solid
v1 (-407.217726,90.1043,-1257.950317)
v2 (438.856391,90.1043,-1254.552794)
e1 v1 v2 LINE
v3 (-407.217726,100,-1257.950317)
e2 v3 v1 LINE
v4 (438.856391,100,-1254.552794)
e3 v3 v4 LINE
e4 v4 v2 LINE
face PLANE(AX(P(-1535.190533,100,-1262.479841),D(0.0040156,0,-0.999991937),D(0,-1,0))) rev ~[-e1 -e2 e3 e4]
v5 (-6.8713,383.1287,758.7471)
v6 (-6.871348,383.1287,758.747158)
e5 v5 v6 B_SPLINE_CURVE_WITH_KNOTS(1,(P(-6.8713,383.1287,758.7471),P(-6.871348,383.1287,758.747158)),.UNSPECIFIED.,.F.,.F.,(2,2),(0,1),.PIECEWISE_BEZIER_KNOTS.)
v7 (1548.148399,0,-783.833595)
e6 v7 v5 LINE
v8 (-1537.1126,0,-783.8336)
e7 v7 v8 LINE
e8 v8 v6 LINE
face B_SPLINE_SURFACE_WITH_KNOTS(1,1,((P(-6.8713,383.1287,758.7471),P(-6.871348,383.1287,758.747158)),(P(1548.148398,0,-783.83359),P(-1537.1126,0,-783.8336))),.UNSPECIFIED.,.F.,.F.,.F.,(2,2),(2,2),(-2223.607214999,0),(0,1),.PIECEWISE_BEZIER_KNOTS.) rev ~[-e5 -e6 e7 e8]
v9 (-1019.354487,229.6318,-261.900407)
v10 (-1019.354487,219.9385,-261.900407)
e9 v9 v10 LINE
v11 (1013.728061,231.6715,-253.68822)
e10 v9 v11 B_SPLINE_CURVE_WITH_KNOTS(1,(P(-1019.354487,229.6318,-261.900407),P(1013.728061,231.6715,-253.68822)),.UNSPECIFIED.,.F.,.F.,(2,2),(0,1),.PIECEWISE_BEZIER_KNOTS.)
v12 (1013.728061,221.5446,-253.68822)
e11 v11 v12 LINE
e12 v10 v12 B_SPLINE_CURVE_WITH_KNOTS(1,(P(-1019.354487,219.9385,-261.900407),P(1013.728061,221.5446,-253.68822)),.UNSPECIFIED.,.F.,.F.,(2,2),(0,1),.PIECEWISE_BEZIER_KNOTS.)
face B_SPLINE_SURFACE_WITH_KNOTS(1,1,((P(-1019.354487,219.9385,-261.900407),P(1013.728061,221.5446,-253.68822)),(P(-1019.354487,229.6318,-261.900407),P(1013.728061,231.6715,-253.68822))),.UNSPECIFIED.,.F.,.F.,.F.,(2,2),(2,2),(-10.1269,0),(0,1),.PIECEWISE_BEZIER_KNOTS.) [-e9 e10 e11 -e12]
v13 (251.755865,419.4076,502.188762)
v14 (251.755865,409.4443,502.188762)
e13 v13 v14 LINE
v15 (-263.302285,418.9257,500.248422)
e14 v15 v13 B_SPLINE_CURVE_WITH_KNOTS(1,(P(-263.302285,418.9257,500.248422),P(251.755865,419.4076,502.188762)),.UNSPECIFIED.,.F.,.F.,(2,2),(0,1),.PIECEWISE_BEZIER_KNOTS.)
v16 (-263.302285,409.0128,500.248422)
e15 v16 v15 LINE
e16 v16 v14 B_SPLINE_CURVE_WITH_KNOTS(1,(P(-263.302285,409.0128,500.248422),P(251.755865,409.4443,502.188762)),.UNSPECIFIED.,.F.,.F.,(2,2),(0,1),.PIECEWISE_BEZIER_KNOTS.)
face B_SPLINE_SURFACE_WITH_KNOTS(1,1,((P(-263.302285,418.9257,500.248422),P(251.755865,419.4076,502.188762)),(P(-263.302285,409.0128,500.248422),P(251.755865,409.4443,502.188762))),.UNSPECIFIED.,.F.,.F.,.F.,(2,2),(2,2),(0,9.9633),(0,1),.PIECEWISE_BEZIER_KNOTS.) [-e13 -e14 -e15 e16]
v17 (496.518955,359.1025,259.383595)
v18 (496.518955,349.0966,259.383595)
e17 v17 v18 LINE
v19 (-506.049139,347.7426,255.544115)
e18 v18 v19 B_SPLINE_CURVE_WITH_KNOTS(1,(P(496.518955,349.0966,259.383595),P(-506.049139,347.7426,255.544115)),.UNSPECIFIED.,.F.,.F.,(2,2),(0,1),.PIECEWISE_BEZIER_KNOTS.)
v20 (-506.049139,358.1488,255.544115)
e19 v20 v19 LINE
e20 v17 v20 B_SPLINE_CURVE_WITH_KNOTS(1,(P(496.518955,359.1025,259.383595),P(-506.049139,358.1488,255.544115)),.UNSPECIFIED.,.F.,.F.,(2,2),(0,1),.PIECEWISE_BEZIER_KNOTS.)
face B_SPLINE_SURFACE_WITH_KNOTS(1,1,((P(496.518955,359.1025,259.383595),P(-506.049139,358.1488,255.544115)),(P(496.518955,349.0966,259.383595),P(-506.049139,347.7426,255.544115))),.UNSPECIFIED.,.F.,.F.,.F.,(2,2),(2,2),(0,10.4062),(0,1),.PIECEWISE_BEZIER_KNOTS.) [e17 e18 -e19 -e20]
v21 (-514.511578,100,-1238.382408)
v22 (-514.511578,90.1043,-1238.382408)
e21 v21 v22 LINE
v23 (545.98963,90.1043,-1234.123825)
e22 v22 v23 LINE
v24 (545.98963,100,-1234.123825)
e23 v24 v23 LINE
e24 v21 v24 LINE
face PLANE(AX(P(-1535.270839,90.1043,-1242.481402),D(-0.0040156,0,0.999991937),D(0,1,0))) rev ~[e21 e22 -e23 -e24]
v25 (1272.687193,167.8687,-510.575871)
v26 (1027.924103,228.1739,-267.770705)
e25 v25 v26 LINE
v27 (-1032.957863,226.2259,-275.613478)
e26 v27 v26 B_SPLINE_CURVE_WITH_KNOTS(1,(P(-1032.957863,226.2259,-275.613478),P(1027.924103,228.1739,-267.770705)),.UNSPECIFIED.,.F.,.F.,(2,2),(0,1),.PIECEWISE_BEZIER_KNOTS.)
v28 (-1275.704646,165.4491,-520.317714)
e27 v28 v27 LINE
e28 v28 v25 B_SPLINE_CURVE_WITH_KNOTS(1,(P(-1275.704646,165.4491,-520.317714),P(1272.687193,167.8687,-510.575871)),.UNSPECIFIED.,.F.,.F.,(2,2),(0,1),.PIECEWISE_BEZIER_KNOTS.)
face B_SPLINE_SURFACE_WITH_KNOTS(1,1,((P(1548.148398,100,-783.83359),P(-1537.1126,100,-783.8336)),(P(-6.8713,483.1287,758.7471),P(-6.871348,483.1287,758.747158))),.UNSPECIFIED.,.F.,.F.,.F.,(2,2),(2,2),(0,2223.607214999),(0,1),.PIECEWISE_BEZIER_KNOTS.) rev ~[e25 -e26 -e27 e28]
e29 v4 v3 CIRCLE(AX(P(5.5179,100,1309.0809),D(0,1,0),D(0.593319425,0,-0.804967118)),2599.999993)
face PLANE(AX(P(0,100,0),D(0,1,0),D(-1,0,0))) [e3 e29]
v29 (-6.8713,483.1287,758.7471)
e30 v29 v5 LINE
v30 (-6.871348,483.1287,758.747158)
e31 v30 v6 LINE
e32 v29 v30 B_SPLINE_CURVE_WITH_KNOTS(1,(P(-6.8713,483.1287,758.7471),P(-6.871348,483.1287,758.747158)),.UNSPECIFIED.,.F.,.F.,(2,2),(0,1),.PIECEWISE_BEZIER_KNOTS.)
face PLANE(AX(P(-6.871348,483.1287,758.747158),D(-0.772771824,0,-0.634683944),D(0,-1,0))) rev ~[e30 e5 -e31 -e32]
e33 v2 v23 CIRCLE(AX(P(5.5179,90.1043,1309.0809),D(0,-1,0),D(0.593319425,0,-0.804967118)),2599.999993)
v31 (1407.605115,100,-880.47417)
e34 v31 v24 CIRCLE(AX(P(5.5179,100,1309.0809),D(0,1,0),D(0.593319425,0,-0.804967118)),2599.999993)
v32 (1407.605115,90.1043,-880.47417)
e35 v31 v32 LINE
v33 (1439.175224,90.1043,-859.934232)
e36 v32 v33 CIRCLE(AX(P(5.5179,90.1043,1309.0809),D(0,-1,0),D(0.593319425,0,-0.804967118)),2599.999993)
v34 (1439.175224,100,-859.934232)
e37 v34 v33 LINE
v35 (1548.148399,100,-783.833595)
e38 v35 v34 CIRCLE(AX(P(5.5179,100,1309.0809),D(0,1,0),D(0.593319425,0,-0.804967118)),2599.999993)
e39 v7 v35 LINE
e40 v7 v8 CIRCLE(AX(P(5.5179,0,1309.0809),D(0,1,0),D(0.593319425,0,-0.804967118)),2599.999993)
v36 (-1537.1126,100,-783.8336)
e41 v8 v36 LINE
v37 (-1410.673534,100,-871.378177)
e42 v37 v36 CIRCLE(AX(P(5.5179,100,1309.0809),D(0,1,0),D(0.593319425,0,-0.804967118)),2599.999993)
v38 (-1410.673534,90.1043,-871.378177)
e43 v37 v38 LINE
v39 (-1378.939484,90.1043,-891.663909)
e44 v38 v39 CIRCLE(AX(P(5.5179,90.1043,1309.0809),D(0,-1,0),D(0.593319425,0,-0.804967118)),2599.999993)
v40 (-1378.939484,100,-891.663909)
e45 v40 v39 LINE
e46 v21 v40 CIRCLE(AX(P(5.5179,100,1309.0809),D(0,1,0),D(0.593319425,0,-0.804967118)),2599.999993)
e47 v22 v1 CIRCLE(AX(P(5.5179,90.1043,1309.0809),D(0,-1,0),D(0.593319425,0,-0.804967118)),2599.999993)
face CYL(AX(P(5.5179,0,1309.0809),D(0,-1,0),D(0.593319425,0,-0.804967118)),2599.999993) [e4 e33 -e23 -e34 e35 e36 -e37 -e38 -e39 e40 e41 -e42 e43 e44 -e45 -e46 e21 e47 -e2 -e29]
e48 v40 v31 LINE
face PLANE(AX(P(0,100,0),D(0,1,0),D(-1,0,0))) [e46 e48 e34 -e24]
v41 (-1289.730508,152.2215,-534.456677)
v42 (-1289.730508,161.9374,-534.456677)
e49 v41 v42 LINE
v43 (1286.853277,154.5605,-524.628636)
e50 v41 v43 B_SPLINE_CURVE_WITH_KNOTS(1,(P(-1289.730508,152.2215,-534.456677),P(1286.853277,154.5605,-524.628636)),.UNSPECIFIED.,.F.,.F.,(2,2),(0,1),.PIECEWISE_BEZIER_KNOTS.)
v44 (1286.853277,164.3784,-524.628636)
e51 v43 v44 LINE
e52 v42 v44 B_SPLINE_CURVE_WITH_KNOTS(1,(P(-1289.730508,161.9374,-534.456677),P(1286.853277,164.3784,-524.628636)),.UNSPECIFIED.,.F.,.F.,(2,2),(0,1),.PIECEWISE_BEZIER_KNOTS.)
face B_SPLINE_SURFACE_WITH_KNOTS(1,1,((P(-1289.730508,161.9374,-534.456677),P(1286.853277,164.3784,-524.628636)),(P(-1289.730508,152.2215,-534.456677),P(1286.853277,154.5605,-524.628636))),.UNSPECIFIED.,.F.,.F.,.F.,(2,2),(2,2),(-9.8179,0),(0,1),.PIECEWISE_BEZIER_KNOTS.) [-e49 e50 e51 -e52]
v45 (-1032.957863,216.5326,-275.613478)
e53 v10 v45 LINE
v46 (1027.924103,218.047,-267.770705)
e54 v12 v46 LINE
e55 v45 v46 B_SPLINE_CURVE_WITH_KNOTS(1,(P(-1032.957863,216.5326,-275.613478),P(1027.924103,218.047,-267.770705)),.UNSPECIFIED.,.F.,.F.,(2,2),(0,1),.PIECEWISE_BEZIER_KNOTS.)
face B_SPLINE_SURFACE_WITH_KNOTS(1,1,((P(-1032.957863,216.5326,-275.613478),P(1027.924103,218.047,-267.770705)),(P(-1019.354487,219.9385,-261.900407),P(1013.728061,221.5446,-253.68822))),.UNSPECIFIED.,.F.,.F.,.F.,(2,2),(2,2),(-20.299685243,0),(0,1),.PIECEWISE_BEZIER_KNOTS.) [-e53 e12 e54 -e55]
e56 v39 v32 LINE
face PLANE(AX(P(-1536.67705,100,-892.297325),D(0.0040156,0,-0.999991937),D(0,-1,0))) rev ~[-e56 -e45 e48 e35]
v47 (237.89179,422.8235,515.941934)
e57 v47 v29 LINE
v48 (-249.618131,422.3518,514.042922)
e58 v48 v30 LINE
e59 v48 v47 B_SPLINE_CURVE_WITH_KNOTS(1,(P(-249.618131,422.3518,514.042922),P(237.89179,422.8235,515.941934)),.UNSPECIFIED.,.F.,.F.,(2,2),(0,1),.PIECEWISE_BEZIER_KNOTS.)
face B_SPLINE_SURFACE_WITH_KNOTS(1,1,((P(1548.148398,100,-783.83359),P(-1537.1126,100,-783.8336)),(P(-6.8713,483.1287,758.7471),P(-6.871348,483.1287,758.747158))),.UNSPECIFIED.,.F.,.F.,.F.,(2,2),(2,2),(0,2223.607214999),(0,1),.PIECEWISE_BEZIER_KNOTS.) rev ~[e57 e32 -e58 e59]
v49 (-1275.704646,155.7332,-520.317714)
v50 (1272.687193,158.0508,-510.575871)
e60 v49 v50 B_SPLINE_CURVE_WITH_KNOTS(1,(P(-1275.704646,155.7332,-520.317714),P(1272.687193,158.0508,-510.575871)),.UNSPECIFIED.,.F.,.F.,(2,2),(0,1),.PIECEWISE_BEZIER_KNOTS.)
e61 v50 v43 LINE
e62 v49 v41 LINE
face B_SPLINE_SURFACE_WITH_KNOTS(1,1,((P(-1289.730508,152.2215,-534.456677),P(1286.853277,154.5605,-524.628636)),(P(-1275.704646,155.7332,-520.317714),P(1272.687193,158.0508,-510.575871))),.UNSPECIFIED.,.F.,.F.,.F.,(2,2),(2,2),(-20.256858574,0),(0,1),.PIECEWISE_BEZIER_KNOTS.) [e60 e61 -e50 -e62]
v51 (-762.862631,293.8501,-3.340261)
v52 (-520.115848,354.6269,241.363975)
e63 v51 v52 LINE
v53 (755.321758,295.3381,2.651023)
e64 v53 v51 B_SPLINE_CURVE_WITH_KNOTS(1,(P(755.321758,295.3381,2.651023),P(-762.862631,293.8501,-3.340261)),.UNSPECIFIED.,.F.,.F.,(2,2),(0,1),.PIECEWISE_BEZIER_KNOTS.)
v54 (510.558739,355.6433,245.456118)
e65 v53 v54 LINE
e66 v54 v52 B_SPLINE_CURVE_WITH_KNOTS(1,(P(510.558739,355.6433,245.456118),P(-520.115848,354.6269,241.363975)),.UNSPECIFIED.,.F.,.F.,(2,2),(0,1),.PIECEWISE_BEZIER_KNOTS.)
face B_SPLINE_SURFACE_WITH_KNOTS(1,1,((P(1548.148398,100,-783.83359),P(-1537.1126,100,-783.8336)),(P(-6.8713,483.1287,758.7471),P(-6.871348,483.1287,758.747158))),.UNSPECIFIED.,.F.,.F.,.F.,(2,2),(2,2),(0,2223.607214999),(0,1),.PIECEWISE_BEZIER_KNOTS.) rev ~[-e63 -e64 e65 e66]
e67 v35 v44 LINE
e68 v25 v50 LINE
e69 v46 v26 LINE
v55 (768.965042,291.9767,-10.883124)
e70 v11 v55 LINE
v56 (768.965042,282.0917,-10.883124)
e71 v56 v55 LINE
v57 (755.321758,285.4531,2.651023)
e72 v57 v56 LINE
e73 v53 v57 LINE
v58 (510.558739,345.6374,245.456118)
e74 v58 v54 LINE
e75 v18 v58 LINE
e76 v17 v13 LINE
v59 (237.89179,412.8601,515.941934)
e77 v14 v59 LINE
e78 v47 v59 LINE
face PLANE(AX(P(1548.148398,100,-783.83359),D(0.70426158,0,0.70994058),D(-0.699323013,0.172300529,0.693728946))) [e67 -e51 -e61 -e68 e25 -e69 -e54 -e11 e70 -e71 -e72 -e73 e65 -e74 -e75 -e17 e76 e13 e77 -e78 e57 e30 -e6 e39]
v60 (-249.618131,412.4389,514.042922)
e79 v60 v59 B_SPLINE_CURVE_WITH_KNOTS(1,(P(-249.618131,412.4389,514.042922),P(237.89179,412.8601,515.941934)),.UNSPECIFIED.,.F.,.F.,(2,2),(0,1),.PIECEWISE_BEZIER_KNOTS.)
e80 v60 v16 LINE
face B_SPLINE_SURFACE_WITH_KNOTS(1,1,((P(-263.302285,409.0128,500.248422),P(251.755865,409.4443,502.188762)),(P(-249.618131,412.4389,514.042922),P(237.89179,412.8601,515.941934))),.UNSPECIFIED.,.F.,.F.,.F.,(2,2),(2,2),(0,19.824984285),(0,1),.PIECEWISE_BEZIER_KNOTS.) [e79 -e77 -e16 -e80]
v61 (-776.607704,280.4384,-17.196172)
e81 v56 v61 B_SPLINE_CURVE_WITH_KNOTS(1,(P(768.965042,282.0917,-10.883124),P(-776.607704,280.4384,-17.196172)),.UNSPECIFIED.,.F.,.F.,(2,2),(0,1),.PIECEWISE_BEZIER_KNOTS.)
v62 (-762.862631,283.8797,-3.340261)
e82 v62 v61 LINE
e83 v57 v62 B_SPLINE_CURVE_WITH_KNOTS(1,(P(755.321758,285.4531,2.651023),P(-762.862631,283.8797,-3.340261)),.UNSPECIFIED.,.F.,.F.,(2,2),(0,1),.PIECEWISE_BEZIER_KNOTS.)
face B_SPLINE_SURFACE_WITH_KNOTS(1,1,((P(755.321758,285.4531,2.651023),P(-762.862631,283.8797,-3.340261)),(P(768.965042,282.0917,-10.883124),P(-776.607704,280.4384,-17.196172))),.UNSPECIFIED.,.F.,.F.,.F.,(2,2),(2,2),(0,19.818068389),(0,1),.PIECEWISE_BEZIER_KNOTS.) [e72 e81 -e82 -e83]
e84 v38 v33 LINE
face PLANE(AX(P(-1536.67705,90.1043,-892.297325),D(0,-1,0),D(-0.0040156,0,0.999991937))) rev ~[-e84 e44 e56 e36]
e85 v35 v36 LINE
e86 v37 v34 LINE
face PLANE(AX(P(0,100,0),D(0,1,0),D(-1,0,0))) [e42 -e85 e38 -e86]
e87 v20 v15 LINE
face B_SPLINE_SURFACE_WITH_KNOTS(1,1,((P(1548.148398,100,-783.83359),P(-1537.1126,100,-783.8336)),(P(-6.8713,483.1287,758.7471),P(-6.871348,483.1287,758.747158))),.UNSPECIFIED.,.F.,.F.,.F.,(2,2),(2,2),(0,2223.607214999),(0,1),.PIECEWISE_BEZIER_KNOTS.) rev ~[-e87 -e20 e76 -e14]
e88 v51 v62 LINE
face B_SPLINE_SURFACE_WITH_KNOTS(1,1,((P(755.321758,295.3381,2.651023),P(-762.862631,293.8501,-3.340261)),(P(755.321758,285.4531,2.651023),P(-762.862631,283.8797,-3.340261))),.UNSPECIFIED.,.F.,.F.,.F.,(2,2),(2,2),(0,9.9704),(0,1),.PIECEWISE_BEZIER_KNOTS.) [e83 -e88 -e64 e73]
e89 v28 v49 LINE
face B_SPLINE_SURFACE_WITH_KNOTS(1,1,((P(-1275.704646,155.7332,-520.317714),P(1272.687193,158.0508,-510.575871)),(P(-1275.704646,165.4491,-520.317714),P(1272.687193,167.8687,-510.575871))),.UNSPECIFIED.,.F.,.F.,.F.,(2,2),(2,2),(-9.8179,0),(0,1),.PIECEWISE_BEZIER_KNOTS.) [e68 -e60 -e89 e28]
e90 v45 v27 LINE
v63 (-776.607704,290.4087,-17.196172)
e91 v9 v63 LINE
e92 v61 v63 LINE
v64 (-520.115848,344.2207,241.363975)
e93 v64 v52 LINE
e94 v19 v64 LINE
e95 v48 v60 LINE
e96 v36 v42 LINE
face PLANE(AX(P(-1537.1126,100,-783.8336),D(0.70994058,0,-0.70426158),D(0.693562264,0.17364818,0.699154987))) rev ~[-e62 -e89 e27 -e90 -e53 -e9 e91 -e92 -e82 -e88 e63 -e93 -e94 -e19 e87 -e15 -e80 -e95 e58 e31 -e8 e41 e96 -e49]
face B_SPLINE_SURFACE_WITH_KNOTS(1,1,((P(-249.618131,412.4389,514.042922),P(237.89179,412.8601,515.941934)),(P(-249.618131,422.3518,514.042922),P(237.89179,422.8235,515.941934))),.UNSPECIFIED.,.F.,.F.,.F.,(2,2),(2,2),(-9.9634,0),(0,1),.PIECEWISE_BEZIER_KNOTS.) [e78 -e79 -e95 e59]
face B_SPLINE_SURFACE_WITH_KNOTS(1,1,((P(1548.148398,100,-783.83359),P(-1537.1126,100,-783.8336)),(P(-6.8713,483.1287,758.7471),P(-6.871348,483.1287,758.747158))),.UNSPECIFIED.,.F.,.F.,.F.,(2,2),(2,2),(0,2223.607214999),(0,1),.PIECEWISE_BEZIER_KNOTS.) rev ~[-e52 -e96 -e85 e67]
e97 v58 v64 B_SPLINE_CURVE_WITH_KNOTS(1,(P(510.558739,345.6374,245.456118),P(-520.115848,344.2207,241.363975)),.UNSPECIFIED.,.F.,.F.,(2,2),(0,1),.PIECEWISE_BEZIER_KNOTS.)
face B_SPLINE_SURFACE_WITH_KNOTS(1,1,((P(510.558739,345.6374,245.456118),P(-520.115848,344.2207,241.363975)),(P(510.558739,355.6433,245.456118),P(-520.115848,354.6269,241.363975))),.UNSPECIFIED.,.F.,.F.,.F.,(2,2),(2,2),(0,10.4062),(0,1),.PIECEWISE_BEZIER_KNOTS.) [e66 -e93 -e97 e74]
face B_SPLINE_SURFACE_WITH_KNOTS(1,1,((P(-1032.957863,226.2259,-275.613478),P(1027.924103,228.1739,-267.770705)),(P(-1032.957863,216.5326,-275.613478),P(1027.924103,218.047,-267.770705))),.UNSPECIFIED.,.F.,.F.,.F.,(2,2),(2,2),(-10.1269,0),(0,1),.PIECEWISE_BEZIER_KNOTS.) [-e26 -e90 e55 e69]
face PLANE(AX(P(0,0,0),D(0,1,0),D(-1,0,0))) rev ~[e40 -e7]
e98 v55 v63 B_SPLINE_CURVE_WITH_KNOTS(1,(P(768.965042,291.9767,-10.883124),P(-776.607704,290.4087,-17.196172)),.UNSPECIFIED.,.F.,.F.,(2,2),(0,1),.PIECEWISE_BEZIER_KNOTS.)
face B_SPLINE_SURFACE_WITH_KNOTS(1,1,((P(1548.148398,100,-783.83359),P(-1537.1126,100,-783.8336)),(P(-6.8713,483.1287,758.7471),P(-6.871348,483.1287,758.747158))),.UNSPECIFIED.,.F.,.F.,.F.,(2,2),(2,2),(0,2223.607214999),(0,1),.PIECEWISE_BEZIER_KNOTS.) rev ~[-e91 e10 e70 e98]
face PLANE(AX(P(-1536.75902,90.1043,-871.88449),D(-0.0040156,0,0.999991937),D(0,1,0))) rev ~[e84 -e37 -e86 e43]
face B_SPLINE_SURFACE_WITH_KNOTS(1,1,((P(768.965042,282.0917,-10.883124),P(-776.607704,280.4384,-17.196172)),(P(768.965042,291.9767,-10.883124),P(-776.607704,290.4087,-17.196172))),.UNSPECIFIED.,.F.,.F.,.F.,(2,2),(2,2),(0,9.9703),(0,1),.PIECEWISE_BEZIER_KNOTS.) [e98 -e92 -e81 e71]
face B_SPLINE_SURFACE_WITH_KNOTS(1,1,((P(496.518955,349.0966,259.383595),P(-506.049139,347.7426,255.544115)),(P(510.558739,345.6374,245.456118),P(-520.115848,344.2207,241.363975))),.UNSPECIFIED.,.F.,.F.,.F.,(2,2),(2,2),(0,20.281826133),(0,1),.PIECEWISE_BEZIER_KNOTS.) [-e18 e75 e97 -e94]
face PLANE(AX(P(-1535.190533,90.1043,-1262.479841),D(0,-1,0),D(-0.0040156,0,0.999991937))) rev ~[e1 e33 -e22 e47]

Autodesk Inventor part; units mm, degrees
sketch "Sketch1" plane through (0, 0, 0) normal (0, 1, 0) x (-1, 0, 0)
  arc A0 (-1548.1484, -783.8336) -> (1537.1126, -783.8336) centre (-5.5179, 1309.0809) ccw
  line L0 (6.8713, 758.7471) -> (-1548.1484, -783.8336)
  line L1 (1537.1126, -783.8336) -> (6.8713, 758.7471)
  line L2 (-1548.1484, -783.8336) -> (1537.1126, -783.8336)
  point P0 (0, 0)
  point P1 (-841.7636, 217.1232)
ref_plane "Work Plane1" through (-6.8713, 0, 758.7471) normal (0.7042616, 0, 0.7099406) x (0.7099406, 0, -0.7042616)
ref_plane "Work Plane2" through (-1537.1126, 0, -783.8336) normal (-0.7099406, 0, 0.7042616) x (0.7042616, 0, 0.7099406)
ref_plane "Work Plane3" through (-6.8713, 0, 758.7471) normal (0, -1, 0) x (0.7099406, 0, -0.7042616)
extrude "Extrusion1" add sketch "Sketch1" along normal blind 100 contours L2 A0
sketch "Sketch2" plane through (-1537.1126, 0, -783.8336) normal (-0.7099406, 0, 0.7042616) x (0.7042616, 0, 0.7099406)
  line L0 (0, 0) -> (0, 100) projected
  line L1 (0, 100) -> (0, 0)
  line L2 (0, 0) -> (2172.8308, 383.1287)
  line L3 (0, 0) -> (2206.3502, 0) construction
  line L4 (0, 100) -> (2172.8308, 483.1287)
  line L5 (0, 100) -> (2206.3502, 100) construction
  line L6 (2172.8308, 483.1287) -> (2172.8308, 383.1287)
  point P0 (1639.0046, 0)
  dimension "d4" = 10
  dimension "d5" = 10
sketch "Sketch4" plane through (-6.8713, 0, 758.7471) normal (0.7042616, 0, 0.7099406) x (0.7099406, 0, -0.7042616)
  line L0 (0, 483.1287) -> (0, 383.1287) projected
  line L1 (0, 483.1287) -> (0, 383.1287)
  line L2 (2190.3519, 0) -> (0, 0) projected
  line L3 (2190.3519, 0) -> (0, 383.1287)
  line L4 (2190.3519, 0) -> (2190.3519, 100) projected
  line L5 (2190.3519, 0) -> (2190.3519, 100)
  line L6 (2190.3519, 100) -> (0, 483.1287)
  point P0 (539.2347, 0)
loft "Loft1" add profiles "Sketch4", "Sketch2"
sketch "Sketch5" plane through (-6.8713, 0, 758.7471) normal (0.7042616, 0, 0.7099406) x (0.7099406, 0, -0.7042616)
  line L0 (344.7656, 422.8235) -> (344.7656, 412.8601)
  line L1 (344.7656, 422.8235) -> (364.2941, 419.4076)
  line L2 (364.2941, 419.4076) -> (364.2941, 409.4443)
  line L3 (364.2941, 409.4443) -> (344.7656, 412.8601)
  point P0 (539.2347, 0)
sketch "Sketch6" plane through (-1537.1126, 0, -783.8336) normal (-0.7099406, 0, 0.7042616) x (0.7042616, 0, 0.7099406)
  line L0 (1828.1481, 422.3518) -> (1828.1481, 412.4389)
  line L1 (1828.1481, 412.4389) -> (1808.7176, 409.0128)
  line L2 (1808.7176, 409.0128) -> (1808.7176, 418.9257)
  line L3 (1808.7176, 418.9257) -> (1828.1481, 422.3518)
  point P0 (1639.0046, 0)
loft "Loft2" cut profiles "Sketch6", "Sketch5"
sketch "Sketch8" plane through (-1537.1126, 0, -783.8336) normal (-0.7099406, 0, 0.7042616) x (0.7042616, 0, 0.7099406)
  line L0 (1464.0348, 358.1488) -> (1464.0348, 347.7426)
  line L1 (1464.0348, 347.7426) -> (1444.0611, 344.2207)
  line L2 (1444.0611, 344.2207) -> (1444.0611, 354.6269)
  line L3 (1444.0611, 354.6269) -> (1464.0348, 358.1488)
  point P0 (1639.0046, 0)
sketch "Sketch10" plane through (-6.8713, 383.1287, 758.7471) normal (0.7042616, 0, 0.7099406) x (0.7099406, 0, -0.7042616)
  line L0 (709.0597, -24.0262) -> (709.0597, -34.0321)
  line L1 (709.0597, -34.0321) -> (728.8357, -37.4913)
  line L2 (728.8357, -37.4913) -> (728.8357, -27.4854)
  line L3 (709.0597, -24.0262) -> (728.8357, -27.4854)
  point P0 (539.2347, -383.1287)
loft "Loft3" cut profiles "Sketch10", "Sketch8"
sketch "Sketch11" plane through (-1537.1126, 0, -783.8336) normal (-0.7099406, 0, 0.7042616) x (0.7042616, 0, 0.7099406)
  line L0 (1099.3784, 293.8501) -> (1099.3784, 283.8797)
  line L1 (1099.3784, 283.8797) -> (1079.8614, 280.4384)
  line L2 (1079.8614, 280.4384) -> (1079.8614, 290.4087)
  line L3 (1079.8614, 290.4087) -> (1099.3784, 293.8501)
  point P0 (1639.0046, 0)
  point P1 (1444.0611, 354.6269)
sketch "Sketch12" plane through (-6.8713, 383.1287, 758.7471) normal (0.7042616, 0, 0.7099406) x (0.7099406, 0, -0.7042616)
  line L0 (1073.6012, -87.7906) -> (1073.6012, -97.6756)
  line L1 (1073.6012, -97.6756) -> (1092.8187, -101.037)
  line L2 (1092.8187, -101.037) -> (1092.8187, -91.152)
  line L3 (1073.6012, -87.7906) -> (1092.8187, -91.152)
  point P0 (539.2347, -383.1287)
loft "Loft4" cut profiles "Sketch12", "Sketch11"
sketch "Sketch13" plane through (-1537.1126, 0, -783.8336) normal (-0.7099406, 0, 0.7042616) x (0.7042616, 0, 0.7099406)
  line L0 (1079.8614, 280.4384) -> (1079.8614, 290.4087) projected
  line L1 (735.1787, 229.6318) -> (735.1787, 219.9385)
  line L2 (735.1787, 219.9385) -> (715.8629, 216.5326)
  line L3 (715.8629, 216.5326) -> (715.8629, 226.2259)
  line L4 (735.1787, 229.6318) -> (715.8629, 226.2259)
  point P0 (1639.0046, 0)
sketch "Sketch14" plane through (-6.8713, 383.1287, 758.7471) normal (0.7042616, 0, 0.7099406) x (0.7099406, 0, -0.7042616)
  line L0 (1437.5842, -151.4572) -> (1437.5842, -161.5841)
  line L1 (1437.5842, -161.5841) -> (1457.5803, -165.0817)
  line L2 (1457.5803, -165.0817) -> (1457.5803, -154.9548)
  line L3 (1437.5842, -151.4572) -> (1457.5803, -154.9548)
  point P0 (539.2347, -383.1287)
loft "Loft5" cut profiles "Sketch13", "Sketch14"
sketch "Sketch15" plane through (-6.8713, 383.1287, 758.7471) normal (0.7042616, 0, 0.7099406) x (0.7099406, 0, -0.7042616)
  line L0 (1802.3459, -215.26) -> (1802.3459, -225.0779)
  line L1 (1802.3459, -225.0779) -> (1822.2998, -228.5682)
  line L2 (1822.2998, -228.5682) -> (1822.2998, -218.7503)
  line L3 (1822.2998, -218.7503) -> (1802.3459, -215.26)
  point P0 (539.2347, -383.1287)
sketch "Sketch16" plane through (-1537.1126, 0, -783.8336) normal (-0.7099406, 0, 0.7042616) x (0.7042616, 0, 0.7099406)
  line L0 (371.1802, 165.4491) -> (371.1802, 155.7332)
  line L1 (371.1802, 155.7332) -> (351.2645, 152.2215)
  line L2 (351.2645, 152.2215) -> (351.2645, 161.9374)
  line L3 (371.1802, 165.4491) -> (351.2645, 161.9374)
  point P0 (1639.0046, 0)
loft "Loft6" cut profiles "Sketch16", "Sketch15"
ref_plane "Work Plane4" through (-1537.1126, 0, -783.8336) normal (0.9999919, 0, 0.0040156) x (0, 1, 0)
sketch "Sketch17" plane through (-1537.1126, 0, -783.8336) normal (0.9999919, 0, 0.0040156) x (0, 1, 0)
  line L0 (100, -513.297) -> (100, 0) projected
  line L1 (0, -513.297) -> (100, -513.297) projected
  line L2 (0, -513.297) -> (0, 0) projected
  line L3 (0, 0) -> (100, 0) projected
  line L4 (100, -478.6501) -> (90.1043, -478.6501)
  line L5 (90.1043, -478.6501) -> (90.1043, -458.6515)
  line L6 (90.1043, -458.6515) -> (100, -458.6515)
  line L7 (100, -478.6501) -> (100, -458.6515)
  line L8 (100, -458.6515) -> (100, -108.4646)
  line L9 (100, -108.4646) -> (90.1043, -108.4646)
  line L10 (90.1043, -108.4646) -> (90.1043, -88.0516)
  line L11 (90.1043, -88.0516) -> (100, -88.0516)
  line L12 (100, -108.4646) -> (100, -88.0516)
  point P0 (0, 777.6548)
  point P1 (100, -12.3893)
  point P2 (0, -12.3893)
extrude "Extrusion2" cut sketch "Sketch17" along normal through all contours L4 L5 L6 L0 | L9 L10 L11 L0
properties part number "eave_panel_corner" material "Wood (Maple)"
